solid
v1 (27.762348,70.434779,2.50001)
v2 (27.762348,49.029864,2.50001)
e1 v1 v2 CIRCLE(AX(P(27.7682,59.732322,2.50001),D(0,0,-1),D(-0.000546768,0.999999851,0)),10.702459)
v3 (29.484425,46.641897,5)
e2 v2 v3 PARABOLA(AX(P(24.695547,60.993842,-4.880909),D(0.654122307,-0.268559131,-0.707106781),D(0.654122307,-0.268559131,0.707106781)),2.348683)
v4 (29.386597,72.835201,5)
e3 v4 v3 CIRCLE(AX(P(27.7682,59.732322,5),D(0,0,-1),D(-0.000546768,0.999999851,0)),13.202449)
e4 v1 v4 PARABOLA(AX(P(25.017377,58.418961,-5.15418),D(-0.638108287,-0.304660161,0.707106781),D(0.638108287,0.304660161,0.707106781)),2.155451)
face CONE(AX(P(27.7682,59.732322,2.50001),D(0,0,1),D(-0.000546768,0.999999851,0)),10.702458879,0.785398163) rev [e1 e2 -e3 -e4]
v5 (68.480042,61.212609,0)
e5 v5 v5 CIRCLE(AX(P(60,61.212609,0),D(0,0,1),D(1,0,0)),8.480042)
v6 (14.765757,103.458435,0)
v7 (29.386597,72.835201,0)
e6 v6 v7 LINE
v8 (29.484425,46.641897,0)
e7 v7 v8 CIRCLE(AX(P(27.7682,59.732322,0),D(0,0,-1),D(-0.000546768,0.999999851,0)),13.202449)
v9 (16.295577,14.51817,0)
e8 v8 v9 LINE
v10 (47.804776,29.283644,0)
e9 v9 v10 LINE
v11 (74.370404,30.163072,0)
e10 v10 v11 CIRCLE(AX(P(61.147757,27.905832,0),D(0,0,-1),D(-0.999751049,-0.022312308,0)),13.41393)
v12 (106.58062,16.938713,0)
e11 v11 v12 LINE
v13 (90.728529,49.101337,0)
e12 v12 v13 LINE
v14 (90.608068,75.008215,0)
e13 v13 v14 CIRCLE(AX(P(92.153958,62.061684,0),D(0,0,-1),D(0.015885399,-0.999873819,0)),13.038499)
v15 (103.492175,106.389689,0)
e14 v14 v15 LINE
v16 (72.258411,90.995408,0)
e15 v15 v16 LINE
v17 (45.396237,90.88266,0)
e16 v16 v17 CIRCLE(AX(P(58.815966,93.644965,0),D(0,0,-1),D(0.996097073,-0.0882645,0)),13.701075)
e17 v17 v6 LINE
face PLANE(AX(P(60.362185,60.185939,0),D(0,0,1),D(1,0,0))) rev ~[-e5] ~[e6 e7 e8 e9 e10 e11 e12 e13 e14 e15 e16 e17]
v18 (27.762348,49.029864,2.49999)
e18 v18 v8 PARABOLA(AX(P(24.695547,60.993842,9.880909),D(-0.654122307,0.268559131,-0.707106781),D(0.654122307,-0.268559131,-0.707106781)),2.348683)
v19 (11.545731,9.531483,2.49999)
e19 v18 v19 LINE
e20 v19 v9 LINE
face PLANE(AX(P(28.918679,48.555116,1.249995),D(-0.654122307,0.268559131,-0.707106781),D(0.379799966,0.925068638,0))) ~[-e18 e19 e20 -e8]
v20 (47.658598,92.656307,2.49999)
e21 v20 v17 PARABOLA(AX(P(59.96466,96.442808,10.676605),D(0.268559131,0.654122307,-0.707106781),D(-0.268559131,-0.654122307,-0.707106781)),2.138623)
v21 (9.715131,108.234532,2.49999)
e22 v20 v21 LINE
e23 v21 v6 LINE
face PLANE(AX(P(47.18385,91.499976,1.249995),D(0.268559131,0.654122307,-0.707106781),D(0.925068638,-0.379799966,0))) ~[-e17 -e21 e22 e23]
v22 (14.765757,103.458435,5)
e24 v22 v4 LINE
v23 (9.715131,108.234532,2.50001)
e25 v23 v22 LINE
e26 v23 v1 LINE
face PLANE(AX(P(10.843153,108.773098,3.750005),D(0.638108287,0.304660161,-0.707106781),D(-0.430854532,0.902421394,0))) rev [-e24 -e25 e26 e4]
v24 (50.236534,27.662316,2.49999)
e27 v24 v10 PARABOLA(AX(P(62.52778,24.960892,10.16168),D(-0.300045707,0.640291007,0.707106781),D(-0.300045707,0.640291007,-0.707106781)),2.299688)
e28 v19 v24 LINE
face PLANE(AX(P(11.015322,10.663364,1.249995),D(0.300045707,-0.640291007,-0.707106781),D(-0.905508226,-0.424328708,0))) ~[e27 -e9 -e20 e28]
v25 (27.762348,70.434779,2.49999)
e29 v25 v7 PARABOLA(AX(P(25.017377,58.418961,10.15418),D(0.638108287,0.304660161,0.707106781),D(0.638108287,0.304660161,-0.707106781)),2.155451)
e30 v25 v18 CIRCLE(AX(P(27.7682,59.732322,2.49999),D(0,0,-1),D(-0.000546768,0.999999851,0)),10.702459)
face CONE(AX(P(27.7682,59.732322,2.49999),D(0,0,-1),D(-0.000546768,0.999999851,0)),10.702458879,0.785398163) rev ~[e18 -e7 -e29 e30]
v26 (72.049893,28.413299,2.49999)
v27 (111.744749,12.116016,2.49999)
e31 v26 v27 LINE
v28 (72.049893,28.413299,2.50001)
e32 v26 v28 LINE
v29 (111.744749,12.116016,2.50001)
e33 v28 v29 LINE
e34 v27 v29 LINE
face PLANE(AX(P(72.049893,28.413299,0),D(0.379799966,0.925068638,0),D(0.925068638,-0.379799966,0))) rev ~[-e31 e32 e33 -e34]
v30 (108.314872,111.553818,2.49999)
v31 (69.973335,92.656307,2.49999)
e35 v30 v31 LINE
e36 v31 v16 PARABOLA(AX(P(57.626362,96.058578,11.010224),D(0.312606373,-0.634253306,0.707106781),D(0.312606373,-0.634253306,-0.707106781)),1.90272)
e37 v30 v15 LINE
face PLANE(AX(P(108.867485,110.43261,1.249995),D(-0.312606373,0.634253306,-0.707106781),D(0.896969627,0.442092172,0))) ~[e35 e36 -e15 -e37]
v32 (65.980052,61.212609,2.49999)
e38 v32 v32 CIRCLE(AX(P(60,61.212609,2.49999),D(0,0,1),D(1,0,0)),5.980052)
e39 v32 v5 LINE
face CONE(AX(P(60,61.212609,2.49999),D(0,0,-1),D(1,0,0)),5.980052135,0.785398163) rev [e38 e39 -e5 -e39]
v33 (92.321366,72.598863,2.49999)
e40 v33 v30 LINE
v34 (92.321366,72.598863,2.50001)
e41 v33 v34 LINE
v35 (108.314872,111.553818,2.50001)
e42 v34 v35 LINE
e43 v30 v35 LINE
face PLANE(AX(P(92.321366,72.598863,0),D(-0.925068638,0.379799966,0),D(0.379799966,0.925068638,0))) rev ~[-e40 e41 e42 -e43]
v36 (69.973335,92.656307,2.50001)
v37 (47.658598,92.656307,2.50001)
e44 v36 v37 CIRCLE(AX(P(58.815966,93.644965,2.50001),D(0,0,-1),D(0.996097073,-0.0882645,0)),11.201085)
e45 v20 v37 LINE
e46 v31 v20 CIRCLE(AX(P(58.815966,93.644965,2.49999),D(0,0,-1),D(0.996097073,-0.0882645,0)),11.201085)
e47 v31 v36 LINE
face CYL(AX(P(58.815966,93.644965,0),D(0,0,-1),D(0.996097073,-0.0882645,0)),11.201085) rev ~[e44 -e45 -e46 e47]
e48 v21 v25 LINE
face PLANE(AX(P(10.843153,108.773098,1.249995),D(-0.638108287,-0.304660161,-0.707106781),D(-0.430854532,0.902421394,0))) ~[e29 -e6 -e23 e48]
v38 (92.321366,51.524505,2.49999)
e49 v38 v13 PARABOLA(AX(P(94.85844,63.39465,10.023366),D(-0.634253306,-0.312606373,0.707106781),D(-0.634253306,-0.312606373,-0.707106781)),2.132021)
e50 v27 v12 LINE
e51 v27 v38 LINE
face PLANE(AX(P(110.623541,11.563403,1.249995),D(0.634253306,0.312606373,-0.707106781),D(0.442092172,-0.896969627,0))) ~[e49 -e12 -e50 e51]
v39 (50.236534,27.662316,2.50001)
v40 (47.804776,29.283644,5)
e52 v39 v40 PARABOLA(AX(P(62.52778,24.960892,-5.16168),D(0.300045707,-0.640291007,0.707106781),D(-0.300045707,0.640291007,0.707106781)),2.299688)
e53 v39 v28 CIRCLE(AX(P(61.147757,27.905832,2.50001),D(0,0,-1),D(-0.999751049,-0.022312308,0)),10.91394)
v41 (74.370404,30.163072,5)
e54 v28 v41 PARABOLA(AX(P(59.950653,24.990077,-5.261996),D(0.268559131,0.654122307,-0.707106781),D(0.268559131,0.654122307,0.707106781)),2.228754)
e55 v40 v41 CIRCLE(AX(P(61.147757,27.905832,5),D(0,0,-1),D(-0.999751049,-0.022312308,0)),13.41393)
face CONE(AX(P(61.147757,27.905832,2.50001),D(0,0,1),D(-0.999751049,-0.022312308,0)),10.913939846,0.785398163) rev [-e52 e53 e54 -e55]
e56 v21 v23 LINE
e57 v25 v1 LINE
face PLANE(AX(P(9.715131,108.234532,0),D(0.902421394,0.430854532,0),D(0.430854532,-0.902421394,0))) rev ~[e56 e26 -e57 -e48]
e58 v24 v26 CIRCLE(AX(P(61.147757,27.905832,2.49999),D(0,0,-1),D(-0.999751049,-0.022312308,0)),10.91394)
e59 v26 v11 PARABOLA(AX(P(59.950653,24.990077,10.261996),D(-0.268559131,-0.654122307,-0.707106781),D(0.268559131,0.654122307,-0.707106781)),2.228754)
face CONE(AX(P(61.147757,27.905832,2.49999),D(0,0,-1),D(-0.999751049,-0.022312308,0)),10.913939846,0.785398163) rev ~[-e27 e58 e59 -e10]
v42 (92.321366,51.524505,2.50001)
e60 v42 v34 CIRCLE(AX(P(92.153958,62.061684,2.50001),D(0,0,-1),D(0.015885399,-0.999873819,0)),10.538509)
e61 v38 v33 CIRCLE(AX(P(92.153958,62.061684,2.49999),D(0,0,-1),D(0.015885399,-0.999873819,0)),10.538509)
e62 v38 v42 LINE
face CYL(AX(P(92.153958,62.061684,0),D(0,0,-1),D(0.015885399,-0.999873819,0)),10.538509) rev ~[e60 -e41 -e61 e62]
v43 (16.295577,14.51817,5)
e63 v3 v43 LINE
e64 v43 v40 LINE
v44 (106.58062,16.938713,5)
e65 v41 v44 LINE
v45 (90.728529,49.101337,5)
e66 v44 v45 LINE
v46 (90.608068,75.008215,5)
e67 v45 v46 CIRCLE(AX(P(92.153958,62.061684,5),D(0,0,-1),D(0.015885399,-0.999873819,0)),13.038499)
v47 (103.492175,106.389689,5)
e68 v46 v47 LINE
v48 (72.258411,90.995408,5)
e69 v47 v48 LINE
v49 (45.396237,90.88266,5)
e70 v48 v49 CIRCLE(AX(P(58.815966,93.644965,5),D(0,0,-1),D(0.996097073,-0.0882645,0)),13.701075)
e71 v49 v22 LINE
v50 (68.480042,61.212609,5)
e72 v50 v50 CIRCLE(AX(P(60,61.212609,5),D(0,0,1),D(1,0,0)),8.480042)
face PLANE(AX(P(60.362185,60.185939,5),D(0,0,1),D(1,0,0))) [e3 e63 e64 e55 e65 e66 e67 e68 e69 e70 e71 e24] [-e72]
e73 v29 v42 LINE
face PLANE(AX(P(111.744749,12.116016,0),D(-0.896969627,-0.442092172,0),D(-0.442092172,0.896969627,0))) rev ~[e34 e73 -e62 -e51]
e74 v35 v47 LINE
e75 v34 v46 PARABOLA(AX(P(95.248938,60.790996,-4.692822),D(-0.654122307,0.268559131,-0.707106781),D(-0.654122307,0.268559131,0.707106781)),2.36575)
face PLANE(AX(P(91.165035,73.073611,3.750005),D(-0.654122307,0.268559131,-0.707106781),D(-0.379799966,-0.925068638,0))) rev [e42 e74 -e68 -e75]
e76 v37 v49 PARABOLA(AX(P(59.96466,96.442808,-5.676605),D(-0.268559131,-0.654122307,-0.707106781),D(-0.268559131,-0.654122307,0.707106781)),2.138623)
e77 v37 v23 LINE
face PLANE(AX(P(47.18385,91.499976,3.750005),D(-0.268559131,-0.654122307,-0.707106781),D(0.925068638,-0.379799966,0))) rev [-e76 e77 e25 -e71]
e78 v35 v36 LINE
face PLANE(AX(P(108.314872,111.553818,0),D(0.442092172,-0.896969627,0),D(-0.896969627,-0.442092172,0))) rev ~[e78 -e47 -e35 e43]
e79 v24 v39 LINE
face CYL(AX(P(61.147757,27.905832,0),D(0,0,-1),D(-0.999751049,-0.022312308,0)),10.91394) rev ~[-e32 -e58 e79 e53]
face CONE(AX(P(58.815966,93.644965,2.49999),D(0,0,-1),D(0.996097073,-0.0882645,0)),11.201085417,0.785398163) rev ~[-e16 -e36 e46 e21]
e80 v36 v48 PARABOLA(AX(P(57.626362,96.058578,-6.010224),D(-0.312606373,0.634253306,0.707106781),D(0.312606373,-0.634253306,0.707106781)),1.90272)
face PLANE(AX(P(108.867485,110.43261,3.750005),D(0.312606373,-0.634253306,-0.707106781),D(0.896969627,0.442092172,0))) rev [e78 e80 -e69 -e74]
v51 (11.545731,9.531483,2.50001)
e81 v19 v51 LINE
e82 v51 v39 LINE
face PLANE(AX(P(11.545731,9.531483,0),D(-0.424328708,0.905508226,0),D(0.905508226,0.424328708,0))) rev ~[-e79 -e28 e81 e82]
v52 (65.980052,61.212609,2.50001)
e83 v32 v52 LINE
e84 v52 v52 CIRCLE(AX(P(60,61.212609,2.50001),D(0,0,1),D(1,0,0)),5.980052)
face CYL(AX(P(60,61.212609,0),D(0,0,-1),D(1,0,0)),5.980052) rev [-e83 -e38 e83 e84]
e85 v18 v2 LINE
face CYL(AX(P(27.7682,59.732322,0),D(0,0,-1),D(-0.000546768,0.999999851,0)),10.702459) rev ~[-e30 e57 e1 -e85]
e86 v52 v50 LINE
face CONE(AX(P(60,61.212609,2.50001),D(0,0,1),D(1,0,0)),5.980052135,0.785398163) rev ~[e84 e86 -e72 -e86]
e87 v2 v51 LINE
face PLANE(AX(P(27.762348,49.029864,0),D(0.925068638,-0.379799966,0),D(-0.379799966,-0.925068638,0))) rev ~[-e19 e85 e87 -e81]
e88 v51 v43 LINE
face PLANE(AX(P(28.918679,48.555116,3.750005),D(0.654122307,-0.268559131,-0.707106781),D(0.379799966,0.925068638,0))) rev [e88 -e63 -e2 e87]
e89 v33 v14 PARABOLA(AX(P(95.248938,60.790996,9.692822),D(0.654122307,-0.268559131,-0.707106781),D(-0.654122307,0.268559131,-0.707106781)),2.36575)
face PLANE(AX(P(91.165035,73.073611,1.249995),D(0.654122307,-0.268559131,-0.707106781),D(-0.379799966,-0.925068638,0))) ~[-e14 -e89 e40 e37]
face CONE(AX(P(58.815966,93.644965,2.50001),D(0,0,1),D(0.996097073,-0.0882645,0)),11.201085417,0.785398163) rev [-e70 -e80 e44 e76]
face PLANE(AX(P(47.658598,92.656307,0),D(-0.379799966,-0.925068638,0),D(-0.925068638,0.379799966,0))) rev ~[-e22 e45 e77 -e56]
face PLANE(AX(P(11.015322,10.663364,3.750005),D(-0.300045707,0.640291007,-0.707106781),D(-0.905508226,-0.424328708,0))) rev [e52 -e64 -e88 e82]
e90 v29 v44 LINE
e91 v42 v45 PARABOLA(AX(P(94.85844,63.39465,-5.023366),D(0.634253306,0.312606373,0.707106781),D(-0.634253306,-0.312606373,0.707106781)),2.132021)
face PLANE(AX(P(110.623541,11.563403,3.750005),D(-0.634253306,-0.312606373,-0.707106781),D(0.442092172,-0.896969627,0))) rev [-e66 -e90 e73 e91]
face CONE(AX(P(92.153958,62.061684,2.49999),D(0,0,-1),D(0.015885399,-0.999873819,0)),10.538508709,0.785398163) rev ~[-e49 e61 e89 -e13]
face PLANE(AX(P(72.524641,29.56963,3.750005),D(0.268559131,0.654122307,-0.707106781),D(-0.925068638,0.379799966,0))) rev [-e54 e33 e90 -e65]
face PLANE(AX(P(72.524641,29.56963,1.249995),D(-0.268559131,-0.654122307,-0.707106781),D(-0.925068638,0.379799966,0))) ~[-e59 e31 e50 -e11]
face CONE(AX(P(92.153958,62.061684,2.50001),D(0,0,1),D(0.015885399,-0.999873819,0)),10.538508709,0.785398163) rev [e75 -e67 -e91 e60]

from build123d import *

# Parameters (mm, degrees)
F0_R     = 5.9800521353
F1_DEPTH = 5
F2_SIZE  = 2.49999


# Not quite as in the source:
# - a fillet or chamfer is up to 0.001 mm smaller than in the source, because OpenCascade refuses the exact size


with BuildPart() as f1:
    # F0 (on Top) → F1 (new body)
    with BuildSketch(Plane.XY):
        with BuildLine():
            Line((27.7623478323, 49.0298643708), (11.5457307547, 9.5314830542))
            Line((11.5457307547, 9.5314830542), (50.2365343273, 27.6623163372))
            ThreePointArc((50.2365343273, 27.6623163372), (60.7722385086, 38.8133091708), (72.0498927169, 28.4132986261))
            Line((72.0498927169, 28.4132986261), (111.7447488987, 12.1160160238))
            Line((111.7447488987, 12.1160160238), (92.3213660153, 51.5245050192))
            ThreePointArc((92.3213660153, 51.5245050192), (81.6154488918, 62.0616839697), (92.3213660153, 72.5988629201))
            Line((92.3213660153, 72.5988629201), (108.314871788, 111.5538179874))
            Line((108.314871788, 111.5538179874), (69.9733346701, 92.6563069494))
            ThreePointArc((69.9733346701, 92.6563069494), (58.8159662766, 82.4438797358), (47.6585978831, 92.6563069494))
            Line((47.6585978831, 92.6563069494), (9.7151305526, 108.2345321774))
            Line((9.7151305526, 108.2345321774), (27.7623478323, 70.4347789288))
            ThreePointArc((27.7623478323, 70.4347789288), (38.47065847, 59.7323216498), (27.7623478323, 49.0298643708))
        make_face()
        with Locations((60, 61.2126085907)):
            Circle(F0_R, mode=Mode.SUBTRACT)
    extrude(amount=F1_DEPTH)

    # F2 (size 2.5 in the source; OpenCascade refuses exactly that, so slightly less here)
    f2_edges = [f1.edges().sort_by_distance(p)[0] for p in [
        (28.686864, 100.44542, 5),
        (18.738739, 89.334656, 5),
        (38.470658, 59.732322, 5),
        (19.654039, 29.280674, 5),
        (30.891133, 18.5969, 5),
        (60.772239, 38.813309, 5),
        (91.897321, 20.264657, 5),
        (102.033057, 31.820261, 5),
        (81.615449, 62.061684, 5),
        (100.318119, 92.07634, 5),
        (89.144103, 102.105062, 5),
        (58.815966, 82.44388, 5),
        (54.019948, 61.212609, 5),
        (28.686864, 100.44542, 0),
        (18.738739, 89.334656, 0),
        (38.470658, 59.732322, 0),
        (19.654039, 29.280674, 0),
        (30.891133, 18.5969, 0),
        (60.772239, 38.813309, 0),
        (91.897321, 20.264657, 0),
        (102.033057, 31.820261, 0),
        (81.615449, 62.061684, 0),
        (100.318119, 92.07634, 0),
        (89.144103, 102.105062, 0),
        (58.815966, 82.44388, 0),
        (54.019948, 61.212609, 0),
    ]]
    chamfer(f2_edges, length=F2_SIZE)


solid = f1.part
